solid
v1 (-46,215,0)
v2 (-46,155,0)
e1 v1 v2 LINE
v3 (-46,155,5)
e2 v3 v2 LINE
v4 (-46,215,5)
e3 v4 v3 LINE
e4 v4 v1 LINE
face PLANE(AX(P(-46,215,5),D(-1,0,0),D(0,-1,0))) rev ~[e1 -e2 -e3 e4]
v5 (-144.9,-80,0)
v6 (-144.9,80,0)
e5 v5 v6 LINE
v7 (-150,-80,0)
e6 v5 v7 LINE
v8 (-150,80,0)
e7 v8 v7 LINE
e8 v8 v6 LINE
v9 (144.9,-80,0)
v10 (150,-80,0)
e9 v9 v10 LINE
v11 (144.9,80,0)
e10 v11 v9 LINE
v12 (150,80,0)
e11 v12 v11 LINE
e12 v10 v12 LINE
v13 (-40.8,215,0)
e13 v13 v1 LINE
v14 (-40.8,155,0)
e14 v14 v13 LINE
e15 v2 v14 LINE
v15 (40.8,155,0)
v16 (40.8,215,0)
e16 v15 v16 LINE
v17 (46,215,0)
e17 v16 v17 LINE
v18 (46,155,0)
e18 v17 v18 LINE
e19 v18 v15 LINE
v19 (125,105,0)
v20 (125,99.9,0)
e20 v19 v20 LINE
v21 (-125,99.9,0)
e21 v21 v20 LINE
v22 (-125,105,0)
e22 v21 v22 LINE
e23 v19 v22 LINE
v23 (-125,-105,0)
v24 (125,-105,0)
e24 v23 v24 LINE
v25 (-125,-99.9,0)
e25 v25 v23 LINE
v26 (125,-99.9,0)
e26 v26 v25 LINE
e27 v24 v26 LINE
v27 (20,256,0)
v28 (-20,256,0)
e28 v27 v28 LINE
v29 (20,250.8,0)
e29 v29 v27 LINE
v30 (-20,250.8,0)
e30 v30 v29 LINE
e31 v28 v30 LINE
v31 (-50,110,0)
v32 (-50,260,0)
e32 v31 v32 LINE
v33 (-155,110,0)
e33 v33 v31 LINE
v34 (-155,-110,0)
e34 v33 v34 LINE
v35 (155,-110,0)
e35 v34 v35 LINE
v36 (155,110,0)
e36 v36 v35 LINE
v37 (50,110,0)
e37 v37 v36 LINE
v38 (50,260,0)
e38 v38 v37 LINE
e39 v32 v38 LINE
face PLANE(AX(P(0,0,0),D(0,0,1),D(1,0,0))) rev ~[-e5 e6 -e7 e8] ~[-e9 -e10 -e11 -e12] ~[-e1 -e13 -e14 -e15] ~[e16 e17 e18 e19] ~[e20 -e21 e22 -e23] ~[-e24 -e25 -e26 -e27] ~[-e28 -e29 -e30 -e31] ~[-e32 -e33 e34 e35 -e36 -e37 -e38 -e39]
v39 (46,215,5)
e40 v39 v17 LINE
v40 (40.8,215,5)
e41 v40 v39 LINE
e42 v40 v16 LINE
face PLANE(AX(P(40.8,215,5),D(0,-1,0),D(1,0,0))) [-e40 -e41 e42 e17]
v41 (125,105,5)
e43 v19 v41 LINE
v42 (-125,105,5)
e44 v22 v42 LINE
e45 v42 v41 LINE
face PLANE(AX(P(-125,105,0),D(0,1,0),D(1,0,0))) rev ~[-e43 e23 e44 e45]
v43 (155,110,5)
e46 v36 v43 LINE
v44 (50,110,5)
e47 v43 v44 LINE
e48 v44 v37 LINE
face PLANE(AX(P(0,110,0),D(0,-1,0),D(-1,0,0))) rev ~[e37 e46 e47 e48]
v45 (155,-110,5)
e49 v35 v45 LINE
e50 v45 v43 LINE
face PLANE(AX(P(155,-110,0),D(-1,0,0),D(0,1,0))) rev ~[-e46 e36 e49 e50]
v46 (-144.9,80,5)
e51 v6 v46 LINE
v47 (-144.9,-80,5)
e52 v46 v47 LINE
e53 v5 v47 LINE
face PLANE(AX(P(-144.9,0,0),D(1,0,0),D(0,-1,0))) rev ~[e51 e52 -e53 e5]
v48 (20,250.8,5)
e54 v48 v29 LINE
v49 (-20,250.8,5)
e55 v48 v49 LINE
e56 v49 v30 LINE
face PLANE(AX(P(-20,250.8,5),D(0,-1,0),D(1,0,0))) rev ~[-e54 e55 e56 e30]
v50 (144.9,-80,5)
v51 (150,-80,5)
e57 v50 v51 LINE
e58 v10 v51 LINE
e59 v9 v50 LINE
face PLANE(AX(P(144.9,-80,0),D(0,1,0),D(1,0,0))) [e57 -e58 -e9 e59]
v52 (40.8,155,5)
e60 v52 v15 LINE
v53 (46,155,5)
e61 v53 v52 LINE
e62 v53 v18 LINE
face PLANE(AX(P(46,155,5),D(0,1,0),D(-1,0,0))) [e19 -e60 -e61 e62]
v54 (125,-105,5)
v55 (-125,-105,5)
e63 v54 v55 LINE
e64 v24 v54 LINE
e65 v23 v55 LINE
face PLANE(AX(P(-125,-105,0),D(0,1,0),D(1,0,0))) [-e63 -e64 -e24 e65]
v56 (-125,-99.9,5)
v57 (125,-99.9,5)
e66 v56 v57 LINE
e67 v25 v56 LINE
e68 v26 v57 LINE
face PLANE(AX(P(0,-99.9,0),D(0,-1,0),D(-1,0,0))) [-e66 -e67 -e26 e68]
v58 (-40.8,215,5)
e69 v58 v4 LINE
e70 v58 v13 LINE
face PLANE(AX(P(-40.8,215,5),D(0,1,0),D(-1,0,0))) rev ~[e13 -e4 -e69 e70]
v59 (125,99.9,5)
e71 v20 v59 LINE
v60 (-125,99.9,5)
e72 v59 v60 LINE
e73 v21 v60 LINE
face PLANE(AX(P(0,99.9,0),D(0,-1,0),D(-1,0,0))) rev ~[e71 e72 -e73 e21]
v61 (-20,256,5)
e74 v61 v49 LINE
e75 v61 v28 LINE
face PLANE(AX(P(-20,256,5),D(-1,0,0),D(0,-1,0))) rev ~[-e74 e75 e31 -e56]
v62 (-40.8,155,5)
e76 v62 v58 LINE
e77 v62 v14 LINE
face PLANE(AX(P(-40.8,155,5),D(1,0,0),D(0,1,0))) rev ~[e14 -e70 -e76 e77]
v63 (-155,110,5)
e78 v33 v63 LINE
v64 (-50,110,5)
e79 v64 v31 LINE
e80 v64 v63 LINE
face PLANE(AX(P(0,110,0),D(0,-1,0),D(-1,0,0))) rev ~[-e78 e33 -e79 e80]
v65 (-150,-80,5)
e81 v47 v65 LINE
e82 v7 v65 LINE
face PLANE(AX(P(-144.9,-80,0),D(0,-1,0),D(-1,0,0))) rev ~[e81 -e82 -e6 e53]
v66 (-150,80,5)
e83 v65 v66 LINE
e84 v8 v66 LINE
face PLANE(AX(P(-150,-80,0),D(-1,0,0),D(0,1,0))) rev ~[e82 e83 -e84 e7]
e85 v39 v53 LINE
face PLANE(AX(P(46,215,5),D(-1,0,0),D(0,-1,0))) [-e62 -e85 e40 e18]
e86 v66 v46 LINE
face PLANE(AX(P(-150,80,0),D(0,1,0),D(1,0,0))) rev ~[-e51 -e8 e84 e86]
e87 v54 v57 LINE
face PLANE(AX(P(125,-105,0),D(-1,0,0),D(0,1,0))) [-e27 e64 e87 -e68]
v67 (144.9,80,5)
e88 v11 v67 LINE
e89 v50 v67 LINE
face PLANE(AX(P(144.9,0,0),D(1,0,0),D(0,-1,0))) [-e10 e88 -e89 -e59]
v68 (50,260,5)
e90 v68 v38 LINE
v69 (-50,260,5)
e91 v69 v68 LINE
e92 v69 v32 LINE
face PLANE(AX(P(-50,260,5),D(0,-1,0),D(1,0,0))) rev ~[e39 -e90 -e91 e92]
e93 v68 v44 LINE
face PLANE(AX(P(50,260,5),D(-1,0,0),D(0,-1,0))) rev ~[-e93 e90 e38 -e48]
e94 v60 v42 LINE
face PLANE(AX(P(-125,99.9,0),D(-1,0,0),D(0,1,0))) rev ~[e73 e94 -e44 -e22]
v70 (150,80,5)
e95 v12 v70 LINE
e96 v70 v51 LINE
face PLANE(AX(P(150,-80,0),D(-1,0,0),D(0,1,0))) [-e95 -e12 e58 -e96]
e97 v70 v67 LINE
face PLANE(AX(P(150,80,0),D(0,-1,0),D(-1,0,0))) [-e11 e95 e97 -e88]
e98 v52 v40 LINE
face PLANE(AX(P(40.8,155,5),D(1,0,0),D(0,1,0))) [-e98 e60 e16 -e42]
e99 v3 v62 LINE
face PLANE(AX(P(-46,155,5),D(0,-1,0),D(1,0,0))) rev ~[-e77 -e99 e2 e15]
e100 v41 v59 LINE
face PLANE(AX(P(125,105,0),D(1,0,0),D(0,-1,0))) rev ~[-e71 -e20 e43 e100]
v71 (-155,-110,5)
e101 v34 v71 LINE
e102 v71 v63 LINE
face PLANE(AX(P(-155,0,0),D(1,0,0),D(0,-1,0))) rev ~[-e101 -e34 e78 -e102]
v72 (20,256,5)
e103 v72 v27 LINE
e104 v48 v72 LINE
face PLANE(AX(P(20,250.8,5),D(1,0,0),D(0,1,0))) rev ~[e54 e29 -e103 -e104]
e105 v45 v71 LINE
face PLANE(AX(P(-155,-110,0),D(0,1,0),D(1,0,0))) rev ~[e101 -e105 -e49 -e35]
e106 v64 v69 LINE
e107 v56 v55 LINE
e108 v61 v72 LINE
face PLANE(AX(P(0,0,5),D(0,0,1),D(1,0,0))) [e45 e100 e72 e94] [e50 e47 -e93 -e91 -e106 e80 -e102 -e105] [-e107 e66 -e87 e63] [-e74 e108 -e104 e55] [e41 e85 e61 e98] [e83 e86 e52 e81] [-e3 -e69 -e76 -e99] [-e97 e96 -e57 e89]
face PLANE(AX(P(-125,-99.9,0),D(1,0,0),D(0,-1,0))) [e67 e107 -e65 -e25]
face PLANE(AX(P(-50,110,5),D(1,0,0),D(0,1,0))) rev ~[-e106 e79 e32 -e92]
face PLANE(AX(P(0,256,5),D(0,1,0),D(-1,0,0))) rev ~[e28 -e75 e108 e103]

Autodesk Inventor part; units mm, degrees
ref_plane "YZ Plane" through (0, 0, 0) normal (1, 0, 0) x (0, 1, 0)
ref_plane "XZ Plane" through (0, 0, 0) normal (0, 1, 0) x (-1, 0, 0)
ref_plane "XY Plane" through (0, 0, 0) normal (0, 0, 1) x (1, 0, 0)
sketch "Sketch1" plane through (0, 0, 0) normal (0, 0, 1) x (1, 0, 0)
  line L0 (-155, -110) -> (155, -110)
  line L1 (155, -110) -> (155, 110)
  line L2 (155, 110) -> (-155, 110)
  line L3 (-155, 110) -> (-155, -110)
  line L4 (-155, -110) -> (155, 110) construction
  line L5 (155, -110) -> (-155, 110) construction
  line L6 (-125, 105) -> (125, 105)
  line L7 (125, 105) -> (125, 99.9)
  line L8 (125, 99.9) -> (-125, 99.9)
  line L9 (-125, 99.9) -> (-125, 105)
  line L10 (150, 80) -> (144.9, 80)
  line L11 (144.9, 80) -> (144.9, -80)
  line L12 (144.9, -80) -> (150, -80)
  line L13 (150, -80) -> (150, 80)
  line L14 (-155, 0) -> (155, 0)
  line L15 (0, 110) -> (0, -110)
  line L16 (-125, -105) -> (125, -105)
  line L17 (125, -105) -> (125, -99.9)
  line L18 (125, -99.9) -> (-125, -99.9)
  line L19 (-125, -99.9) -> (-125, -105)
  line L20 (-150, 80) -> (-144.9, 80)
  line L21 (-144.9, 80) -> (-144.9, -80)
  line L22 (-144.9, -80) -> (-150, -80)
  line L23 (-150, -80) -> (-150, 80)
  point P0 (0, 0)
  point P1 (0, 105)
  point P2 (144.9, 0)
  point P3 (0, -105)
  point P4 (-144.9, 0)
  dimension "d0" = 310
  dimension "d1" = 220
  dimension "d2" = 5.1
  dimension "d3" = 5.1
  dimension "d4" = 30
  dimension "d5" = 30
  dimension "d6" = 5
  dimension "d7" = 5
extrude "Plate1" add sketch "Sketch1" along normal blind 5 contours L3 L14 L23 L22 L21 L15 L18 L19 L16 L0 | L15 L16 L17 L18 L14 L11 L12 L13 L1 L0 | L3 L2 L15 L6 L9 L8 L14 L21 L20 L23 | L14 L13 L10 L11 L15 L8 L7 L6 L2 L1
sketch "Sketch2" plane through (0, 0, 5) normal (0, 0, 1) x (1, 0, 0)
  line L0 (-50, 260) -> (50, 260)
  line L1 (50, 260) -> (50, 110)
  line L2 (50, 110) -> (-50, 110)
  line L3 (-50, 110) -> (-50, 260)
  line L4 (-155, 110) -> (155, 110)
  point P0 (0, 0)
  point P1 (0, 260)
  point P2 (0, 110)
  point P3 (0, 110)
  dimension "d9" = 100
  dimension "d10" = 150
sheet face with bend "Face2" sketch "Sketch2" thickness 5 toward (0, 0, -1) bend radius 5
bend "Bend1"
sketch "Sketch3" plane through (0, 0, 5) normal (0, 0, 1) x (1, 0, 0)
  line L0 (-20, 250.8) -> (20, 250.8)
  line L1 (20, 250.8) -> (20, 256)
  line L2 (20, 256) -> (-20, 256)
  line L3 (-20, 256) -> (-20, 250.8)
  line L4 (-20, 250.8) -> (20, 256) construction
  line L5 (20, 250.8) -> (-20, 256) construction
  line L6 (50, 260) -> (-50, 260) projected
  line L7 (-46, 155) -> (-40.8, 155)
  line L8 (-40.8, 155) -> (-40.8, 215)
  line L9 (-40.8, 215) -> (-46, 215)
  line L10 (-46, 215) -> (-46, 155)
  line L11 (-46, 155) -> (-40.8, 215) construction
  line L12 (-40.8, 155) -> (-46, 215) construction
  line L13 (-50, 260) -> (-50, 110) projected
  line L14 (-125, 105) -> (125, 105) projected
  line L15 (0, 105) -> (0, 260)
  line L16 (46, 155) -> (40.8, 155)
  line L17 (40.8, 155) -> (40.8, 215)
  line L18 (40.8, 215) -> (46, 215)
  line L19 (46, 215) -> (46, 155)
  line L20 (46, 155) -> (40.8, 215) construction
  line L21 (40.8, 155) -> (46, 215) construction
  point P0 (0, 0)
  point P1 (0, 253.4)
  point P2 (-43.4, 185)
  point P3 (-50, 185)
  point P4 (43.4, 185)
  dimension "d16" = 5.2
  dimension "d17" = 4
  dimension "d18" = 40
  dimension "d19" = 5.2
  dimension "d20" = 60
  dimension "d21" = 4
extrude "Cut1" cut sketch "Sketch3" against normal blind 5
feature "Corner Round1" [suppressed]
equation "\"d7\" = d6"
equation "\"d21\" = d17"
equation "\"d22\" = Thickness"
equation "\"d8\" = Thickness"
equation "\"d11\" = BendRadius"
equation "\"d12\" = BendReliefWidth"
equation "\"d14\" = MinimumRemnant"
equation "\"d13\" = BendReliefDepth"
equation "\"d15\" = TransitionRadius"
equation "\"BendRadius\" = Thickness"
equation "\"BendReliefWidth\" = Thickness"
equation "\"BendReliefDepth\" = 0.5 * Thickness"
equation "\"TransitionRadius\" = BendRadius"
equation "\"JacobiRadiusSize\" = BendRadius"
equation "\"GapSize\" = Thickness"
equation "\"Thickness\" = 5"
equation "\"MinimumRemnant\" = 10"
properties part number "Finishing Sheets .5 ( Buttom )"
